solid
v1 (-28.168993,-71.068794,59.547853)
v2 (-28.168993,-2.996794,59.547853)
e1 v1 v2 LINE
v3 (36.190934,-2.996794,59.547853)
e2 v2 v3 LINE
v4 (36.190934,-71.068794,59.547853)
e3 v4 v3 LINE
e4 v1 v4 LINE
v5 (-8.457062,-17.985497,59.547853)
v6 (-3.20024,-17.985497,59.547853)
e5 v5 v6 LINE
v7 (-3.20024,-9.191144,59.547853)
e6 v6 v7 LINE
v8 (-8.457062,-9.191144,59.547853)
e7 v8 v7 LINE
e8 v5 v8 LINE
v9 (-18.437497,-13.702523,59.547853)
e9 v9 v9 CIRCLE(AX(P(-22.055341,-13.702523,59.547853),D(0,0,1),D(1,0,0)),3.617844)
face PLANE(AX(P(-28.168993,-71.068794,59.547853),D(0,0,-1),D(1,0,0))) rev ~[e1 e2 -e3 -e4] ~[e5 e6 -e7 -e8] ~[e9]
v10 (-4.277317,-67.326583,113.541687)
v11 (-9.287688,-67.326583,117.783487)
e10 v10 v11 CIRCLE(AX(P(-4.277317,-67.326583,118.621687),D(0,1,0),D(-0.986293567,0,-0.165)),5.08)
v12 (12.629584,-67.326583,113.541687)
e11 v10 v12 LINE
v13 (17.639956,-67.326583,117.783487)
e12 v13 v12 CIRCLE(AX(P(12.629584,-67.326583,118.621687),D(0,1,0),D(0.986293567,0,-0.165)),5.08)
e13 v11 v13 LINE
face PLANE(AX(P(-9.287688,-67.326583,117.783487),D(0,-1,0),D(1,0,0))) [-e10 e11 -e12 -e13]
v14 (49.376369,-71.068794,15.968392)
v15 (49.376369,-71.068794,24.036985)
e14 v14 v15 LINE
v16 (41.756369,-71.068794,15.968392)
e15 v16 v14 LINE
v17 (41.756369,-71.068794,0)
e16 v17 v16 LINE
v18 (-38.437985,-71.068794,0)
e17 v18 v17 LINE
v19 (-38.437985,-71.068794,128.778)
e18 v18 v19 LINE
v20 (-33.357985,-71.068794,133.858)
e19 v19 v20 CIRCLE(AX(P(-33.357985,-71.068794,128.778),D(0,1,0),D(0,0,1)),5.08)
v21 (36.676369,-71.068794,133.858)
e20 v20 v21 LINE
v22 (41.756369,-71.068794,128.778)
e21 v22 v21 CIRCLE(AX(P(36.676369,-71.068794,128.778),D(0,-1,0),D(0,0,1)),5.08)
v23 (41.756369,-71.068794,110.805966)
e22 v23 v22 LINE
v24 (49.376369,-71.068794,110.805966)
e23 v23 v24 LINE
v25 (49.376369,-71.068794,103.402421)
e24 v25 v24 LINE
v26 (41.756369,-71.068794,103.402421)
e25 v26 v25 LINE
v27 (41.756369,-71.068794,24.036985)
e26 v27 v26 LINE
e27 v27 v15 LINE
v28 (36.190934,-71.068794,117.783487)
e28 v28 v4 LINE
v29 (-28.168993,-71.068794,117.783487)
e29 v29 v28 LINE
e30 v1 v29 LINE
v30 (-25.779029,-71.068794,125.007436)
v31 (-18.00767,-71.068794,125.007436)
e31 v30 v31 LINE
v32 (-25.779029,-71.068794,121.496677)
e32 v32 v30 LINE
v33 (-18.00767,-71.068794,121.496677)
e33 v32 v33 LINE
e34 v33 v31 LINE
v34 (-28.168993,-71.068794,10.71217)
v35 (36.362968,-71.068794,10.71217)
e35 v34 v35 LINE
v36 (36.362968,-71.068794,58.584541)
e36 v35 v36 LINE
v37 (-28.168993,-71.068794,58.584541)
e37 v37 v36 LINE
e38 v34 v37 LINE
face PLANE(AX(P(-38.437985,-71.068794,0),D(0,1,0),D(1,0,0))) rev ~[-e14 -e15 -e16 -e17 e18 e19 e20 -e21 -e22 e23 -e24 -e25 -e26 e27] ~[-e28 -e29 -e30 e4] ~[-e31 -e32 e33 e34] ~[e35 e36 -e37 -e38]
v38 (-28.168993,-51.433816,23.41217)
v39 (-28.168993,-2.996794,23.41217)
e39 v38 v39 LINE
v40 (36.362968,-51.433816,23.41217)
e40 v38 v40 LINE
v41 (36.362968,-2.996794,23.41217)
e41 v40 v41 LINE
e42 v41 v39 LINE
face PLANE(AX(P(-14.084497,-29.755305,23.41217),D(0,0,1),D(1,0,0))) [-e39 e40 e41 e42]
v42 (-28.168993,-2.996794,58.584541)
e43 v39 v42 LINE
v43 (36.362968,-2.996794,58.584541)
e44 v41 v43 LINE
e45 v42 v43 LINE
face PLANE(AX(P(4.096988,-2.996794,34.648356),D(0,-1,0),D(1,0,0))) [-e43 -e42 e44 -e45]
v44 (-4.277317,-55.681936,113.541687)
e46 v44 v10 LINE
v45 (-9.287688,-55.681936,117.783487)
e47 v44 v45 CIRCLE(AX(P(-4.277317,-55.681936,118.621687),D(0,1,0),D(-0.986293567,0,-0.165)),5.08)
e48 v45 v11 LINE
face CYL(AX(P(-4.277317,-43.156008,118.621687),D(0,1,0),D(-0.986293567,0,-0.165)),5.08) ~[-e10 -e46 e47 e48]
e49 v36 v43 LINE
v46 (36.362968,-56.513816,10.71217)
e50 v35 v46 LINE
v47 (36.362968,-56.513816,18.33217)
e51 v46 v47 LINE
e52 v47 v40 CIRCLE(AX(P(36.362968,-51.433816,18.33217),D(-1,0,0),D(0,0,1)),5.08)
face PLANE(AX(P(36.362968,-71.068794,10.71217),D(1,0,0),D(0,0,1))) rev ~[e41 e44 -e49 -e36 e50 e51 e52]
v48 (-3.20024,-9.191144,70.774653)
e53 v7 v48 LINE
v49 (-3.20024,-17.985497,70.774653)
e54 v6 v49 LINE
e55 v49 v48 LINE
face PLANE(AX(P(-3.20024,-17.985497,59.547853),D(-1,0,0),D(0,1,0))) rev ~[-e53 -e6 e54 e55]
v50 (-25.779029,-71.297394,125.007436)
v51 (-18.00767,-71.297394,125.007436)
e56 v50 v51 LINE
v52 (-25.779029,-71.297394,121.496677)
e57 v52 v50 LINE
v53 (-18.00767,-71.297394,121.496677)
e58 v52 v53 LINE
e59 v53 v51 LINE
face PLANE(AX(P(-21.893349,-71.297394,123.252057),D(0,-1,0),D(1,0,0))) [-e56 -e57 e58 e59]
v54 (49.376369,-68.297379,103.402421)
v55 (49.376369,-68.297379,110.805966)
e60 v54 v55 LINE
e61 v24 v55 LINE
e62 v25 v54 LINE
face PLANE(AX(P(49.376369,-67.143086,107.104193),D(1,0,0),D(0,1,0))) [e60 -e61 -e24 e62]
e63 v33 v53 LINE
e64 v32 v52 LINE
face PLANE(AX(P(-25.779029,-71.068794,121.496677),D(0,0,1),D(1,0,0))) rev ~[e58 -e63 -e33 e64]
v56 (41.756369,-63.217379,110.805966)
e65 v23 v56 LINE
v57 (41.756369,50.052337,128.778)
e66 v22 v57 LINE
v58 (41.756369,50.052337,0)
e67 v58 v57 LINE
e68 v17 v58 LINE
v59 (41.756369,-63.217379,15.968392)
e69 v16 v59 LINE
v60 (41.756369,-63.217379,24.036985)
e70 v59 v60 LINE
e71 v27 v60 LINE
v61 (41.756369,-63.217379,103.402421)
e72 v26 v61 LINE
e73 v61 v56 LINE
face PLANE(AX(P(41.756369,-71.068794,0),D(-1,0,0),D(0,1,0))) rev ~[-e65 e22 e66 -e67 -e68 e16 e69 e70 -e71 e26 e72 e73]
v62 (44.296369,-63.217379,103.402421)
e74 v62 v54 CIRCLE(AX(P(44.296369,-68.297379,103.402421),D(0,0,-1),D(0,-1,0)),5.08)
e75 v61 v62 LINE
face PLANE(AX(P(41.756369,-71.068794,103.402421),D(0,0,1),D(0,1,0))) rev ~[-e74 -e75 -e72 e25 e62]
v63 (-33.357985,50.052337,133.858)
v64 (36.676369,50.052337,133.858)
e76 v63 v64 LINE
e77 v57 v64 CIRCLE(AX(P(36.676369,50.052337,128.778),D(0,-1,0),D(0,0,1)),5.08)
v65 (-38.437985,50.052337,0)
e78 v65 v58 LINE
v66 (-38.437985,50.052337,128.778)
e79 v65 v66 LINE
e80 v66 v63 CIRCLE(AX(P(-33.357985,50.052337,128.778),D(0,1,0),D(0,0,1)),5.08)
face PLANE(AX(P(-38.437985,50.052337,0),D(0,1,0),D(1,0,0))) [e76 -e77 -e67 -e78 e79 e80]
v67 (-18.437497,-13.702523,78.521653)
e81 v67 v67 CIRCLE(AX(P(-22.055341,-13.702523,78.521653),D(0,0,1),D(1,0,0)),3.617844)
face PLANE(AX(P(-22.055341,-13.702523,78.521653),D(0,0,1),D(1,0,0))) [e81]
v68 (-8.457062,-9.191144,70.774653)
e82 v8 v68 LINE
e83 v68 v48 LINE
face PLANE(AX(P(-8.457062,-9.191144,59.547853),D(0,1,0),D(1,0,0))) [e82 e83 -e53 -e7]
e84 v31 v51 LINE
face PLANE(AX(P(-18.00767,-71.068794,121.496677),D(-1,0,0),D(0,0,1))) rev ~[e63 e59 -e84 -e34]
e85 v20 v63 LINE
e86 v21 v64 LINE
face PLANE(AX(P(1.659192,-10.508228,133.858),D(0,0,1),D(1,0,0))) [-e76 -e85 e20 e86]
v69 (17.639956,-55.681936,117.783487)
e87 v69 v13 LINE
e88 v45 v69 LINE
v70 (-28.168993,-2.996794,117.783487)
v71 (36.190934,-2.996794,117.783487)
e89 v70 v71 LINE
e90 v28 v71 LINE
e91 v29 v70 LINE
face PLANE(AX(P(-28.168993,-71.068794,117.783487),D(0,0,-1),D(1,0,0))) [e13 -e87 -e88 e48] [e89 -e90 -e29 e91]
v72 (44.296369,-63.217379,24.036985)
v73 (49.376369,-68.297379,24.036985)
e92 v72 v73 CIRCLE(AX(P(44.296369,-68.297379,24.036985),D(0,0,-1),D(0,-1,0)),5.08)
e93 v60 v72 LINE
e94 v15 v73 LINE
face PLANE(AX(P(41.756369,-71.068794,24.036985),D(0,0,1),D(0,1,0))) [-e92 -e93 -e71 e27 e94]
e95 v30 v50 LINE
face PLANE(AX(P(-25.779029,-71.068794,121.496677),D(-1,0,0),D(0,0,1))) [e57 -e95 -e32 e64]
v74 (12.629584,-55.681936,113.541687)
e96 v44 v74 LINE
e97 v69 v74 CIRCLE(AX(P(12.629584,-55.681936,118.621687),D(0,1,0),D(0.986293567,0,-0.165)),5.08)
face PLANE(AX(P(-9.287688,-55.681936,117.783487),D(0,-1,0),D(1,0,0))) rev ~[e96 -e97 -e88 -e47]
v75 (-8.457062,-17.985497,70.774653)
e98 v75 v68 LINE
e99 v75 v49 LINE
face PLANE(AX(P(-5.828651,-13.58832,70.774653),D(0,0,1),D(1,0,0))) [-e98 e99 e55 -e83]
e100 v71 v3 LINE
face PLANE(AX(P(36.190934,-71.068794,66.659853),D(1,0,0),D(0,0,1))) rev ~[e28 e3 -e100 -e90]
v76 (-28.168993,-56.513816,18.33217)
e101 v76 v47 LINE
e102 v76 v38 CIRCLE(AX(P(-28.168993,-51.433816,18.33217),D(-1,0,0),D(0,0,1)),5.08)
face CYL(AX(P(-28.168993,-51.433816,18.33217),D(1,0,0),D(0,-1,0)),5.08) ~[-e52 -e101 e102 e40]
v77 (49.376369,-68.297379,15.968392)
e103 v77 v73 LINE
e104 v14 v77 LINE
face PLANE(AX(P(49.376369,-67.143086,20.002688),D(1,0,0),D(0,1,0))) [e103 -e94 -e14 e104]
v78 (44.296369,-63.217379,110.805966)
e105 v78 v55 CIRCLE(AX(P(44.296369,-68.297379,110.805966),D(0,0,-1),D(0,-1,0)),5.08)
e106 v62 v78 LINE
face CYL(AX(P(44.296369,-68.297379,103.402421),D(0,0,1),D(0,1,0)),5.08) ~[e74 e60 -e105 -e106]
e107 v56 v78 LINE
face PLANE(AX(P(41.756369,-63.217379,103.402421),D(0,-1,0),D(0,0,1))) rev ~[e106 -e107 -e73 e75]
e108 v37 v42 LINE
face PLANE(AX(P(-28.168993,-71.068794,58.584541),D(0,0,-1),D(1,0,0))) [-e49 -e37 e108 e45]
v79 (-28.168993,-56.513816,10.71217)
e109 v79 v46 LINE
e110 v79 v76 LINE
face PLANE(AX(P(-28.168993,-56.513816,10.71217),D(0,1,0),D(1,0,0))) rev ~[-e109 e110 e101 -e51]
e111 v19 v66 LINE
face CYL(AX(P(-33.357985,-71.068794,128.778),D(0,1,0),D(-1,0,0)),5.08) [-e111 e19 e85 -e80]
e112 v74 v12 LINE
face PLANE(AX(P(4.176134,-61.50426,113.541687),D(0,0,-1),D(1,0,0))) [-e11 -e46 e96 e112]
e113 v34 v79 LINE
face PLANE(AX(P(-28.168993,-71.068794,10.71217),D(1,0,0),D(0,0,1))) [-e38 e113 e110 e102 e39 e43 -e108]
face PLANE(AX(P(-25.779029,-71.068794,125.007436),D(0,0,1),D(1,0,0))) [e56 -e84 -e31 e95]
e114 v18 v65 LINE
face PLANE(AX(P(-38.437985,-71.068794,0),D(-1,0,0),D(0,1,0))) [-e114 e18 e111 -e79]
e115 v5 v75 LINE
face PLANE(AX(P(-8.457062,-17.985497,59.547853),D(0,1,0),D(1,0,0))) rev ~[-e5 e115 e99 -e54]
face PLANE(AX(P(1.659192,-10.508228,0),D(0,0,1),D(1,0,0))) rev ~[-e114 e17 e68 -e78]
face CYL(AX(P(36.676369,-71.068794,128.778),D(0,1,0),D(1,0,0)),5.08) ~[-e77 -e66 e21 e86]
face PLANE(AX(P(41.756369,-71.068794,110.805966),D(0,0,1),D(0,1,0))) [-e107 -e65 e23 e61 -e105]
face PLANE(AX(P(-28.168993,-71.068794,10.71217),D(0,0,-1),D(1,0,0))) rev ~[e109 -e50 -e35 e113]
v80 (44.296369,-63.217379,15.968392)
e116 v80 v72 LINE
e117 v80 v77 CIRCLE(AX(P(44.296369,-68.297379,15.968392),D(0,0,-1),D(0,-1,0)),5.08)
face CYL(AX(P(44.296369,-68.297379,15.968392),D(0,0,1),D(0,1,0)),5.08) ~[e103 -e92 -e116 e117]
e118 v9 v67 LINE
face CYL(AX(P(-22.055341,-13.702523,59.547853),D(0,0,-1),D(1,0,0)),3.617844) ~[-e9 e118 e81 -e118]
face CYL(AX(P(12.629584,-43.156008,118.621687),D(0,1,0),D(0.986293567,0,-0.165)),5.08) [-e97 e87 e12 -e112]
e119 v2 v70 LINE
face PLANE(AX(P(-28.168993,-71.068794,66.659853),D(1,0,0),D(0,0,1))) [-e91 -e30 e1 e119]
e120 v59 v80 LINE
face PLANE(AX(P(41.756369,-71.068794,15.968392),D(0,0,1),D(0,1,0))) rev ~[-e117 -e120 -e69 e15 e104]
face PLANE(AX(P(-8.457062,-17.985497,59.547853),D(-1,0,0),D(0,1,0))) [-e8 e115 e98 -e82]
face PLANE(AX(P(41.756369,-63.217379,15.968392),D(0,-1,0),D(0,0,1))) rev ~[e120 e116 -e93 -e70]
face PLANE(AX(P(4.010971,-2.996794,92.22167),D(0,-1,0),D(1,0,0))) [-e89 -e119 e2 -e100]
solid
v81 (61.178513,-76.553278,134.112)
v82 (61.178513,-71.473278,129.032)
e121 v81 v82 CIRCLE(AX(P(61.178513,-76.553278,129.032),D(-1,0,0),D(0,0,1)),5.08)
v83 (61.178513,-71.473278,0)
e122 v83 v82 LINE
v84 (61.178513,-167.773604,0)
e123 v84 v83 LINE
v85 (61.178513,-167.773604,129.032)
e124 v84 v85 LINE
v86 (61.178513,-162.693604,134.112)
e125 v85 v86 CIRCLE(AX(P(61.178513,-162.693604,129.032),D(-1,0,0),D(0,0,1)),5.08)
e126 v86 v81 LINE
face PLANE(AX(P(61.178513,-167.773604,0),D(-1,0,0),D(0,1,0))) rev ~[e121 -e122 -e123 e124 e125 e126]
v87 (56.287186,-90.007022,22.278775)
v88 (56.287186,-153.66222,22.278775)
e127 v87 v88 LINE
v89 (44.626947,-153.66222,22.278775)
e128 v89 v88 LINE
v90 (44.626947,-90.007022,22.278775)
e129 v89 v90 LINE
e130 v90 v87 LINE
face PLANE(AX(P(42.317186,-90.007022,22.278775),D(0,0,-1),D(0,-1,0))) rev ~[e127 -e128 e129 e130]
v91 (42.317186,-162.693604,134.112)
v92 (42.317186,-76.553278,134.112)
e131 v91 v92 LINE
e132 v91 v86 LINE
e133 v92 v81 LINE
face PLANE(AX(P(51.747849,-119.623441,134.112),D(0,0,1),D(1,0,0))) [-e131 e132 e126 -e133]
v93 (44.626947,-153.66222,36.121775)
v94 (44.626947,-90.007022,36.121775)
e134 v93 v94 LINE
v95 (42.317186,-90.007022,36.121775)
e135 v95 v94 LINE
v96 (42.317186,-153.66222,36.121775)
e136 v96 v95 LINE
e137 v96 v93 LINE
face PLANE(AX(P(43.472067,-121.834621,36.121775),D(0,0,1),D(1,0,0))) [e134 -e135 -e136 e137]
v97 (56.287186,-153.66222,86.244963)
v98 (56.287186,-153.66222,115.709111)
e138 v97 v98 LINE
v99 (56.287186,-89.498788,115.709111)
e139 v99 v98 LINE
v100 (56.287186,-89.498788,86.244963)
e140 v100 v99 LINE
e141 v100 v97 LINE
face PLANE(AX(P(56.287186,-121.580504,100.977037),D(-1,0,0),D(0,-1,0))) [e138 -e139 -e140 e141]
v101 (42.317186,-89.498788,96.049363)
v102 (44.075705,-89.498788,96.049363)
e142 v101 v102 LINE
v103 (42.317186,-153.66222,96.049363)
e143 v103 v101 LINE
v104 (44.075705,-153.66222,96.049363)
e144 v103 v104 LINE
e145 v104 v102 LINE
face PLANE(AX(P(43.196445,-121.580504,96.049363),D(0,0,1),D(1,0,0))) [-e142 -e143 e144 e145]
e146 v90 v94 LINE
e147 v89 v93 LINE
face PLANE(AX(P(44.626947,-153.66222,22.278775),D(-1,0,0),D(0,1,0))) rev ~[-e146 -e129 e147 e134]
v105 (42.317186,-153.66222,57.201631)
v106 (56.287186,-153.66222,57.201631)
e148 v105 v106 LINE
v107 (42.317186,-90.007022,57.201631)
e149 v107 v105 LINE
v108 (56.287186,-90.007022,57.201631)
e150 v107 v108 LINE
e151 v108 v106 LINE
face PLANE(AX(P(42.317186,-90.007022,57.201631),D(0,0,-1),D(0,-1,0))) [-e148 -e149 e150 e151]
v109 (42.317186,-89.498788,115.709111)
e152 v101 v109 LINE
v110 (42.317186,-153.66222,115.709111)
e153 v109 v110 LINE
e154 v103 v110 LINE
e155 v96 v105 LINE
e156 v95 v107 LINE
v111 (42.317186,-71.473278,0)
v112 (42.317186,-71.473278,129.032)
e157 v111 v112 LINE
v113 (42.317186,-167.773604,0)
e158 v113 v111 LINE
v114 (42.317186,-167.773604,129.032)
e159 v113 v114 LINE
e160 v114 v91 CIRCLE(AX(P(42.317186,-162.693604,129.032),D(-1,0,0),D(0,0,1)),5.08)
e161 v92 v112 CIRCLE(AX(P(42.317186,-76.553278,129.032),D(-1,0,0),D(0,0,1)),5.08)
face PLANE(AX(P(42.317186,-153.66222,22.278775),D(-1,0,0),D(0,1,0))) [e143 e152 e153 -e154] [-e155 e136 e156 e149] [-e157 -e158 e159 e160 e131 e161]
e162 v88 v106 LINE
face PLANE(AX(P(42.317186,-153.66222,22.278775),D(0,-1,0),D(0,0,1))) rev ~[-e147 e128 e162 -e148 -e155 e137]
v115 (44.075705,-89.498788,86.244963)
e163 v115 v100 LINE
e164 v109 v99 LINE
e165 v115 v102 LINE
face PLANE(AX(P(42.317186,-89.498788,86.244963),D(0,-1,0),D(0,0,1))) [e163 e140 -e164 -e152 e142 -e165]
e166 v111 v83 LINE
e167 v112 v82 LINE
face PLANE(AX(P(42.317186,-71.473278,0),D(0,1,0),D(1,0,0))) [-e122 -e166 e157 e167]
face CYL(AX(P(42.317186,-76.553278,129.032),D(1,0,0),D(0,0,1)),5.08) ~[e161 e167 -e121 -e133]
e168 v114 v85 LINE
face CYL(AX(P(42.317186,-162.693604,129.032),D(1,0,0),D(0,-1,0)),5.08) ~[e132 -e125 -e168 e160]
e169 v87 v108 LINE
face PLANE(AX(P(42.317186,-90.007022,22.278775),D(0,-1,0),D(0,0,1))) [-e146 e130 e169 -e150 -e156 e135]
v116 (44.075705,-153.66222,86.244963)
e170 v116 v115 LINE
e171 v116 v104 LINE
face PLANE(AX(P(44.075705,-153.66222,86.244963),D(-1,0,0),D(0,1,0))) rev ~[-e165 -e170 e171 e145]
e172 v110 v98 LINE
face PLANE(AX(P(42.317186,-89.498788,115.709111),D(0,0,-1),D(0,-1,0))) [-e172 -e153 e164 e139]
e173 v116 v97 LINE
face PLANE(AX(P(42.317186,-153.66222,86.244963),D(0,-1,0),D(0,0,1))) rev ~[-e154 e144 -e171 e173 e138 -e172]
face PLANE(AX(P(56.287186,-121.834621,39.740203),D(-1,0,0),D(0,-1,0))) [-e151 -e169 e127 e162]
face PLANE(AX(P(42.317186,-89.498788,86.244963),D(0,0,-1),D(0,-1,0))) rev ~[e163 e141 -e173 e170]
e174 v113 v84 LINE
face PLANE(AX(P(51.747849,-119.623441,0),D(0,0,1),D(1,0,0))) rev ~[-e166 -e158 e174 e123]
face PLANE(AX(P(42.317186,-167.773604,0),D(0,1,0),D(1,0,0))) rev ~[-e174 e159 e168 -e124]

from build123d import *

# Parameters (mm, degrees)
F0_W         = 80.1943540573
F0_H         = 121.1211308837
F1_DEPTH     = 133.858
F2_W         = 18.8613273203
F2_H         = 96.3003262877
F3_DEPTH     = 134.112
F4_W         = 64.1634315252
F4_H         = 29.464147985
F4_W_2       = 63.6551976204
F4_H_2       = 34.9228568375
F5_DEPTH     = 13.97
F6_W         = 1.7585195601
F6_H         = 64.1634315252
F7_DEPTH     = 9.8044
F8_W         = 2.3097619414
F8_H         = 63.6551976204
F9_DEPTH     = 13.843
F10_R        = 5.08
F10_2_R      = 5.08
F11_W        = 7.8514143825
F11_H        = 7.4035450816
F11_H_2      = 8.0685932189
F12_DEPTH    = 7.62
F13_R        = 5.08
F14_W        = 64.35992755
F14_H        = 51.1236339808
F14_W_2      = 64.5319614559
F14_H_2      = 47.8723710403
F15_DEPTH    = 68.072
F16_DEPTH    = 7.112
F17_W        = 28.1689930707
F17_H        = 53.517022583
F17_W_2      = 36.3629683852
F18_DEPTH    = 12.7
F19_R        = 5.08
F20_W        = 7.7713597566
F20_H        = 3.5107582808
F21_DEPTH    = 0.2286
F22_W        = 26.9276434556
F22_H        = 11.6446465254
F23_DEPTH    = 4.2418
F24_T1_DEPTH = 36.6965031233
F25_R        = 3.6178439309
F26_DEPTH    = 18.9738
F27_W        = 5.2568218671
F27_H        = 8.7943524122
F28_DEPTH    = 11.2268


# Not quite as in the source:
# - a fillet or chamfer that OpenCascade refuses, or shapes differently, is made with other operations: its cross-section is extruded or revolved along the edge and cut away or added


with BuildPart() as f1:
    # F0 (on Top) → F1 (new body)
    with BuildSketch(Plane.XY):
        with Locations((1.6591921449, -10.5082280934)):
            Rectangle(F0_W, F0_H)
    extrude(amount=F1_DEPTH)

    # F10
    f10_edges = [f1.edges().sort_by_distance(p)[0] for p in [
        (-38.437985, -10.508228, 133.858),
        (41.756369, -10.508228, 133.858),
    ]]
    fillet(f10_edges, radius=F10_R)

    # F11 (on face) → F12 (join)
    with BuildSketch(Plane.YZ.offset(41.7563691735)):
        with Locations((-67.143086344, 107.1041934192)):
            Rectangle(F11_W, F11_H)
        with Locations((-67.143086344, 20.0026882812)):
            Rectangle(F11_W, F11_H_2)
    extrude(amount=F12_DEPTH)

    # F13
    f13_edges = [f1.edges().sort_by_distance(p)[0] for p in [
        (49.376369, -63.217379, 107.104193),
        (49.376369, -63.217379, 20.002688),
    ]]
    fillet(f13_edges, radius=F13_R)

    # F14 (on face) → F15 (cut)
    with BuildSketch(Plane.XZ.offset(71.0687935352)):
        with Locations((4.0109707043, 92.2216698527)):
            Rectangle(F14_W, F14_H)
        with Locations((4.0969876572, 34.6483555622)):
            Rectangle(F14_W_2, F14_H_2)
    extrude(amount=-F15_DEPTH, mode=Mode.SUBTRACT)

    # F16 (cut): a face of the model
    f16_faces = [f1.faces().sort_by_distance(p)[0] for p in [
        (4.0109707043, -37.0327935352, 66.6598528624),
    ]]
    extrude(f16_faces, amount=-F16_DEPTH, mode=Mode.SUBTRACT)

    # F17 (on face) → F18 (join)
    with BuildSketch(Plane.XY.offset(10.7121700421)):
        with Locations((-14.0844965354, -29.7553048267)):
            Rectangle(F17_W, F17_H)
        with Locations((18.1814841926, -29.7553048267)):
            Rectangle(F17_W_2, F17_H)
    extrude(amount=F18_DEPTH)

    # F19
    f19_edges = [f1.edges().sort_by_distance(p)[0] for p in [
        (4.096988, -56.513816, 23.41217),
    ]]
    fillet(f19_edges, radius=F19_R)

    # F20 (on face) → F21 (join)
    with BuildSketch(Plane.XZ.offset(71.0687935352)):
        with Locations((-21.8933494762, 123.2520565391)):
            Rectangle(F20_W, F20_H)
    extrude(amount=F21_DEPTH)

    # F22 (on face) → F23 (join)
    with BuildSketch(Plane(origin=(0, 0, 117.7834868431), x_dir=(1, 0, 0), z_dir=(0, 0, -1))):
        with Locations((4.1761337779, 61.5042597055)):
            Rectangle(F22_W, F22_H)
    extrude(amount=F23_DEPTH)

    # F24: fillet of radius 5.08 on 2 edges, made by hand

    # F24_s2 → F24_t1 (cut)
    with BuildSketch(Plane.XZ.offset(43.1560081439)):
        with BuildLine():
            ThreePointArc((-9.2876879498, 117.7834868431), (-7.559720018, 114.7445451124), (-4.2773166303, 113.5416868431))
            Line((-4.2773166303, 113.5416868431), (-9.2876879498, 113.5416868431))
            Line((-9.2876879498, 113.5416868431), (-9.2876879498, 117.7834868431))
        make_face()
        with BuildLine():
            ThreePointArc((17.6399555057, 117.7834868431), (15.9119875739, 114.7445451124), (12.6295841862, 113.5416868431))
            Line((12.6295841862, 113.5416868431), (17.6399555057, 113.5416868431))
            Line((17.6399555057, 113.5416868431), (17.6399555057, 117.7834868431))
        make_face()
    extrude(amount=F24_T1_DEPTH, mode=Mode.SUBTRACT)

    # F25 (on face) → F26 (join)
    with BuildSketch(Plane.XY.offset(59.5478528624)):
        with Locations((-22.0553409308, -13.7025229633)):
            Circle(F25_R)
    extrude(amount=F26_DEPTH)

    # F27 (on face) → F28 (join)
    with BuildSketch(Plane.XY.offset(59.5478528624)):
        with Locations((-5.8286509011, -13.5883204639)):
            Rectangle(F27_W, F27_H)
    extrude(amount=F28_DEPTH)


with BuildPart() as f3:
    # F2 (on Top) → F3 (new body)
    with BuildSketch(Plane.XY):
        with Locations((51.7478492111, -119.6234412491)):
            Rectangle(F2_W, F2_H)
    extrude(amount=F3_DEPTH)

    # F4 (on face) → F5 (cut)
    with BuildSketch(Plane(origin=(42.3171855509, 0, 0), x_dir=(0, -1, 0), z_dir=(-1, 0, 0))):
        with Locations((121.580503881, 100.977037102)):
            Rectangle(F4_W, F4_H)
        with Locations((121.8346208334, 39.7402029485)):
            Rectangle(F4_W_2, F4_H_2)
    extrude(amount=-F5_DEPTH, mode=Mode.SUBTRACT)

    # F6 (on face) → F7 (join)
    with BuildSketch(Plane.XY.offset(86.2449631095)):
        with Locations((43.196445331, -121.580503881)):
            Rectangle(F6_W, F6_H)
    extrude(amount=F7_DEPTH)

    # F8 (on face) → F9 (join)
    with BuildSketch(Plane.XY.offset(22.2787745297)):
        with Locations((43.4720665216, -121.8346208334)):
            Rectangle(F8_W, F8_H)
    extrude(amount=F9_DEPTH)

    # F10#2
    f10_2_edges = [f3.edges().sort_by_distance(p)[0] for p in [
        (51.747849, -167.773604, 134.112),
        (51.747849, -71.473278, 134.112),
    ]]
    fillet(f10_2_edges, radius=F10_2_R)


solid = Compound([f1.part, f3.part])
